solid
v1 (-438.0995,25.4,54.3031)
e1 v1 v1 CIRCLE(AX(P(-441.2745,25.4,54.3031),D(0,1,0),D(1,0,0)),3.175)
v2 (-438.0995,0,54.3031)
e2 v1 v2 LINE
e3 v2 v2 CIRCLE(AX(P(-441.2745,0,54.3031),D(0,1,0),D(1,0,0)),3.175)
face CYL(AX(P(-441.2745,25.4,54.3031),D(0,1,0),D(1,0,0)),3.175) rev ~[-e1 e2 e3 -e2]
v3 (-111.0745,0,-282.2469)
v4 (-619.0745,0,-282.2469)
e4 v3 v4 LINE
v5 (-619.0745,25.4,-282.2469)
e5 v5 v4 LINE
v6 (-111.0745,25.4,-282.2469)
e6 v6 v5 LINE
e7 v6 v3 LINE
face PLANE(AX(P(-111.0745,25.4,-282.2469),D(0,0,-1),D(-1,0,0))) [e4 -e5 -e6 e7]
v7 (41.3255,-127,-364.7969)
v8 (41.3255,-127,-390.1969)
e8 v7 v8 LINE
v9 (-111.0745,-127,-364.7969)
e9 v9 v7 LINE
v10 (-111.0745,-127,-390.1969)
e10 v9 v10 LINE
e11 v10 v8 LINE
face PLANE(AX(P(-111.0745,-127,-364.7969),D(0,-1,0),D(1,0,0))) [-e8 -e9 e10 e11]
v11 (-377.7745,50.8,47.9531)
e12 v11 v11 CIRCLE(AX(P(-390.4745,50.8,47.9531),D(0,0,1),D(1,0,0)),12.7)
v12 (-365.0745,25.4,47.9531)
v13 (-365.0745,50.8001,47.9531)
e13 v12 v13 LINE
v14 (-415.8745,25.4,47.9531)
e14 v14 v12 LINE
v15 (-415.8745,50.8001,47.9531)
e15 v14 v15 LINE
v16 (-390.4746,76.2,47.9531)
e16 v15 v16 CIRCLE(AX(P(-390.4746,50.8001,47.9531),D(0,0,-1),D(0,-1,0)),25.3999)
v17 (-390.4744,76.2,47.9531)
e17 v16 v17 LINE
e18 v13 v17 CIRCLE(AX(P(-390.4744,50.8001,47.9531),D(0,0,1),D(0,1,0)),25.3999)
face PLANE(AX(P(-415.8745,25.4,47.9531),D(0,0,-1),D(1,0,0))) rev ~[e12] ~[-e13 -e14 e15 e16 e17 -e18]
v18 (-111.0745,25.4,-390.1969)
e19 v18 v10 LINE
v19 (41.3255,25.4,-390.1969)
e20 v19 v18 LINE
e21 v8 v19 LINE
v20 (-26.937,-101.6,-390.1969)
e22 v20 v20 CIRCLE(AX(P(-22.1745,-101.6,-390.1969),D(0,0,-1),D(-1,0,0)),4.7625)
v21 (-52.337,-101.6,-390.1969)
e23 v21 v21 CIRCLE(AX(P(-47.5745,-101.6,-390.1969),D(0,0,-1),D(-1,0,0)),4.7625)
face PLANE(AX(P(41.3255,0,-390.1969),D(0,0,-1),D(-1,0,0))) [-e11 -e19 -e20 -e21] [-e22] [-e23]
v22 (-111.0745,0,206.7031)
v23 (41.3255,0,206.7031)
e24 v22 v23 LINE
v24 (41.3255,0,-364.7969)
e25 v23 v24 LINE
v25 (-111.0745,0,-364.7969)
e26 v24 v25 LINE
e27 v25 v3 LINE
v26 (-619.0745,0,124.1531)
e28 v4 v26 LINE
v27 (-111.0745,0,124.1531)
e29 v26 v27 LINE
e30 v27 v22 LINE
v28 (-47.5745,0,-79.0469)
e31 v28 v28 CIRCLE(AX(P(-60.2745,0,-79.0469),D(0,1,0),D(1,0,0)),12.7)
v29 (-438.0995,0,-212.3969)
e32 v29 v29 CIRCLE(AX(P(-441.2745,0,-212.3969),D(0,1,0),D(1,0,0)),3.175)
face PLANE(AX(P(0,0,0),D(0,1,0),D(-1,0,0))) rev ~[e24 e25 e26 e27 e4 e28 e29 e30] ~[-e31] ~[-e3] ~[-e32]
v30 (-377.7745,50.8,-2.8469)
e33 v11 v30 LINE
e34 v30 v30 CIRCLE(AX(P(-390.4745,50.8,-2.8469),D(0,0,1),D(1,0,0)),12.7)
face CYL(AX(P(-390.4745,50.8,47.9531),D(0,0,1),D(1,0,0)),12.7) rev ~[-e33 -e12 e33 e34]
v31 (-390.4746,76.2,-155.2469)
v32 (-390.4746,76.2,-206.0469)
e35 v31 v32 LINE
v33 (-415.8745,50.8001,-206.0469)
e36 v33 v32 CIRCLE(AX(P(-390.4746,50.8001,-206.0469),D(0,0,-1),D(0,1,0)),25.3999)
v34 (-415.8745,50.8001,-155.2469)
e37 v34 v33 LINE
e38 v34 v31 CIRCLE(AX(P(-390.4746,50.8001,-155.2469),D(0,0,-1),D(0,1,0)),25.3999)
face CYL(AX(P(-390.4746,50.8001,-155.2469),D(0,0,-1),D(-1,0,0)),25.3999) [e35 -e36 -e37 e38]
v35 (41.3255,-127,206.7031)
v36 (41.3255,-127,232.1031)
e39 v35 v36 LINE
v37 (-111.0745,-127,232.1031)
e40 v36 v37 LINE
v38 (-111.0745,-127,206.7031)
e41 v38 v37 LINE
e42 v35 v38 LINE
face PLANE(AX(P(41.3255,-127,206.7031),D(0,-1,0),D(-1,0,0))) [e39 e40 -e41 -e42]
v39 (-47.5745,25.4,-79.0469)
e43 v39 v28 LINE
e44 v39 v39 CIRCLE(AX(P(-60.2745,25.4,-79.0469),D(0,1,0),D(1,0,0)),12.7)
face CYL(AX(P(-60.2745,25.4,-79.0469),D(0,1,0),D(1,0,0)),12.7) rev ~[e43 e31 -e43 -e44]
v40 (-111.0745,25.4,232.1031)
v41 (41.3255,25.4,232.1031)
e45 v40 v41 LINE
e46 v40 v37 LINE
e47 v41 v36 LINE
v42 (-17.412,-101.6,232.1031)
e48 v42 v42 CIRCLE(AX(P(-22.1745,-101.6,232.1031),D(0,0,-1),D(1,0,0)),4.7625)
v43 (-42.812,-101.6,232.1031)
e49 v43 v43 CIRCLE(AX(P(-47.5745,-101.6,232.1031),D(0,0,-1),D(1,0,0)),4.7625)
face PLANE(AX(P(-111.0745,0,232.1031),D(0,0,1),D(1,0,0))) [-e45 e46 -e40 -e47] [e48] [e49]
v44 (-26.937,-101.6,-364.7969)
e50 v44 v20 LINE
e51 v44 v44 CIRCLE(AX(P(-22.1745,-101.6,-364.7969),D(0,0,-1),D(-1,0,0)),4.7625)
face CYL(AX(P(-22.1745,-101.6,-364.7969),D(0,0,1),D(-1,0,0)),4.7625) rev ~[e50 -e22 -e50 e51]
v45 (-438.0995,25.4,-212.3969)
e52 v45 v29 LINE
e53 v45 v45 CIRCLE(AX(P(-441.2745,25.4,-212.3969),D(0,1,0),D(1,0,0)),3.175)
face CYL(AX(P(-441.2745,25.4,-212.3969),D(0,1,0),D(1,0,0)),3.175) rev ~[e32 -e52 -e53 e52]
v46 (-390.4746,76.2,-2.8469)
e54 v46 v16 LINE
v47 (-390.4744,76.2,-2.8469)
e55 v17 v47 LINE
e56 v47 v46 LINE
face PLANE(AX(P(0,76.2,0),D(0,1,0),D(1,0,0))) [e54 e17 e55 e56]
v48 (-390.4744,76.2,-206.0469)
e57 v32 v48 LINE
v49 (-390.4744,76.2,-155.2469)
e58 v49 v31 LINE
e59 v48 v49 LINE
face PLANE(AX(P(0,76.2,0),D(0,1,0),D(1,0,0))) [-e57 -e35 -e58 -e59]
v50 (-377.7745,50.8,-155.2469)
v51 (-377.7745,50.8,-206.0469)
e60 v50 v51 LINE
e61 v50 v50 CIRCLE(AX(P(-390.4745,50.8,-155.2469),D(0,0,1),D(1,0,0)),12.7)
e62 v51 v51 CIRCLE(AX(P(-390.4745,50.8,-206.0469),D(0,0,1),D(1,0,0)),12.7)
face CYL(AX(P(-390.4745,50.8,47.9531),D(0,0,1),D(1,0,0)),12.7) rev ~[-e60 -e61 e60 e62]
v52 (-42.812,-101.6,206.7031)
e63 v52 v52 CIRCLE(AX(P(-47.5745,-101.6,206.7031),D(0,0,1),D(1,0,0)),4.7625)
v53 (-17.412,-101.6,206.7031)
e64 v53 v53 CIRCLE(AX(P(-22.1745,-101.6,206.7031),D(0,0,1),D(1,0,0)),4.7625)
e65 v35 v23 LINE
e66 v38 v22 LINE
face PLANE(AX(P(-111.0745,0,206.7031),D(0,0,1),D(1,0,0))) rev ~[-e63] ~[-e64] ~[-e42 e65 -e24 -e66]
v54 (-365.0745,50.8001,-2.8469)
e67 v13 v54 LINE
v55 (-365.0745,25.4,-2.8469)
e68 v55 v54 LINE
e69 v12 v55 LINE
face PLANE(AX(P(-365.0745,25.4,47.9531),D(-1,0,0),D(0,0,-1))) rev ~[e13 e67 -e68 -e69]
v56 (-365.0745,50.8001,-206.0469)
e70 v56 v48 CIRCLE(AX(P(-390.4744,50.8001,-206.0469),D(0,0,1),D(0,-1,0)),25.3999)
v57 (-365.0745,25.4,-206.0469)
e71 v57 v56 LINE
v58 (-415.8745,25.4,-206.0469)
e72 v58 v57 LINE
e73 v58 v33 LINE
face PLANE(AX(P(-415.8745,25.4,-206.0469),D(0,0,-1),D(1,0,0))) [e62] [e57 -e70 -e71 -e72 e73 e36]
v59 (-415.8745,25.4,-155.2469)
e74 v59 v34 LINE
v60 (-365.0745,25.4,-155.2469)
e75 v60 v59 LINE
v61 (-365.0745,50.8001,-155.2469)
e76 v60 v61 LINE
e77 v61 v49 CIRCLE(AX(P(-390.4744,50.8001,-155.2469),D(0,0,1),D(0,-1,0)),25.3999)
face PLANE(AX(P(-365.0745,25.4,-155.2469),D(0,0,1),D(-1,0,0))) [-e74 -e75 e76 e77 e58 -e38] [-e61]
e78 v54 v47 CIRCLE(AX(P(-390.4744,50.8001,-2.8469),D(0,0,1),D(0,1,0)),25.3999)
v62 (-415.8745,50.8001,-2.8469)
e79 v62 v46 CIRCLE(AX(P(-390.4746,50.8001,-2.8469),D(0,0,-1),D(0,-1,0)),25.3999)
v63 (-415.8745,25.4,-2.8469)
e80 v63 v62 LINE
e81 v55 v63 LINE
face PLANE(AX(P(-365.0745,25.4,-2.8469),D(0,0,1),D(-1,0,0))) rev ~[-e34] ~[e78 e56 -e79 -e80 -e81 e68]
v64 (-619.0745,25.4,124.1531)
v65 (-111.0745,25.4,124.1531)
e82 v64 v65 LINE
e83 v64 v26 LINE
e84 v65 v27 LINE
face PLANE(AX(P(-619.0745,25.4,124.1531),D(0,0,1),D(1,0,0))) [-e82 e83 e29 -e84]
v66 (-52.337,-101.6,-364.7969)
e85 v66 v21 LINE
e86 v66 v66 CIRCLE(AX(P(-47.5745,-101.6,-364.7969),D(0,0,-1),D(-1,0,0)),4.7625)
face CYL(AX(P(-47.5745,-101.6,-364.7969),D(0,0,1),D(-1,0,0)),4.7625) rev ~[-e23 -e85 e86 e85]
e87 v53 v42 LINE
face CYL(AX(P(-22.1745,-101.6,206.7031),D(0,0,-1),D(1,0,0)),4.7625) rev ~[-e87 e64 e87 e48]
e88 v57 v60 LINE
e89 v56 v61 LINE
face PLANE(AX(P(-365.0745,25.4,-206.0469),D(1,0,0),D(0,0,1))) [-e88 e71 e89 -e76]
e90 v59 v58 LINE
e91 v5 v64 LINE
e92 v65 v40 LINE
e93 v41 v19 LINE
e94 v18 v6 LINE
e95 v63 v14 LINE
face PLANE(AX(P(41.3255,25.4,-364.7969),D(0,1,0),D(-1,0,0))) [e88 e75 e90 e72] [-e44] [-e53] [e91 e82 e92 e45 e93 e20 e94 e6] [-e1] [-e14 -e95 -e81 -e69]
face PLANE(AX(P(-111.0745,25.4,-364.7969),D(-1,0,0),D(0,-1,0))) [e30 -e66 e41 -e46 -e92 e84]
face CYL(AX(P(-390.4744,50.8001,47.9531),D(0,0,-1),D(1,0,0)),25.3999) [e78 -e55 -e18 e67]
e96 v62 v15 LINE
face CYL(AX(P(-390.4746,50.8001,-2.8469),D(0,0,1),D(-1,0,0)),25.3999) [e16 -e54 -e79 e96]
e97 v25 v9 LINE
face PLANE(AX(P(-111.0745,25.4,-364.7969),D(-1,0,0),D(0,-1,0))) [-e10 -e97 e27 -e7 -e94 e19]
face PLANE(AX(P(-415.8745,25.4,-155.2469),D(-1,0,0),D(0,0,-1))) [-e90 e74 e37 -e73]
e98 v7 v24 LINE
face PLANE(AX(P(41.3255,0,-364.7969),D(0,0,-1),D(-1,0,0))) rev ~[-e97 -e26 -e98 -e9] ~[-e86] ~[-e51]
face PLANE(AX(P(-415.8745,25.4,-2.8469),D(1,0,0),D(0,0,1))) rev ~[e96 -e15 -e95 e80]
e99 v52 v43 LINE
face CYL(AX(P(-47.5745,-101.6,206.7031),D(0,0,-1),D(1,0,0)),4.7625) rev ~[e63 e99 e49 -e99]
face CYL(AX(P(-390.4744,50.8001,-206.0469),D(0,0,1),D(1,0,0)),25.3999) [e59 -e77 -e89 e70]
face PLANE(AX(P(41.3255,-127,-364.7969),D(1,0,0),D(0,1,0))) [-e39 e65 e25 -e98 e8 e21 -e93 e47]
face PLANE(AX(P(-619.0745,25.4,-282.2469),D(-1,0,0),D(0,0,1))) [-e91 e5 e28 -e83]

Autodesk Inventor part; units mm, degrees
ref_plane "YZ Plane" through (0, 0, 0) normal (1, 0, 0) x (0, 1, 0)
ref_plane "XZ Plane" through (0, 0, 0) normal (0, 1, 0) x (-1, 0, 0)
ref_plane "XY Plane" through (0, 0, 0) normal (0, 0, 1) x (1, 0, 0)
sketch "Sketch1" plane through (0, 0, 0) normal (0, 1, 0) x (-1, 0, 0)
  line L0 (111.0745, 206.7031) -> (-41.3255, 206.7031)
  line L1 (-41.3255, 206.7031) -> (-41.3255, -364.7969)
  line L2 (-41.3255, -364.7969) -> (111.0745, -364.7969)
  line L3 (111.0745, -364.7969) -> (111.0745, 206.7031)
  point P0 (0, 0)
  dimension "d0" = 571.5
  dimension "d1" = 152.4
extrude "Extrusion1" add sketch "Sketch1" along normal blind 25.4
sketch "Sketch2" plane through (-111.0745, 0, 206.7031) normal (0, 0, 1) x (1, 0, 0)
  line L0 (0, 0) -> (0, 25.4) projected
  line L1 (0, 25.4) -> (152.4, 25.4)
  line L2 (152.4, 25.4) -> (152.4, -127)
  line L3 (152.4, -127) -> (0, -127)
  line L4 (0, -127) -> (0, 25.4)
  line L5 (152.4, 0) -> (152.4, 25.4) projected
  line L6 (0, 0) -> (152.4, 0) projected
  line L7 (0, -127) -> (152.4, -127)
  line L8 (152.4, -127) -> (152.4, -101.6)
  line L9 (152.4, -101.6) -> (0, -101.6)
  line L10 (0, -101.6) -> (0, -127)
  circle A0 centre (63.5, -101.6) radius 4.7625
  circle A1 centre (88.9, -101.6) radius 4.7625
  line L11 (0, -127) -> (63.5, -101.6) construction
  line L12 (88.9, -101.6) -> (152.4, -127) construction
  point P0 (111.0745, 0)
  point P1 (58.7375, -101.6)
  point P2 (68.2625, -101.6)
  point P3 (84.1375, -101.6)
  point P4 (93.6625, -101.6)
  dimension "d5" = 127
  dimension "d6" = 25.4
  dimension "d7" = 25.4
  dimension "d8" = 9.525
extrude "Extrusion2" add sketch "Sketch2" along normal blind 25.4 contours L6 L2 L9 A1 A0 L4 | L0 L1 L2 L6 | L9 A0 A1 L2 L3 L4
sketch "Sketch3" plane through (41.3255, 0, -364.7969) normal (0, 0, -1) x (-1, 0, 0)
  line L0 (0, 25.4) -> (152.4, 25.4) projected
  line L1 (152.4, 0) -> (152.4, -127) projected
  line L2 (0, 25.4) -> (152.4, 25.4)
  line L3 (152.4, 25.4) -> (152.4, -127)
  line L4 (152.4, -127) -> (0, -127)
  line L5 (0, -127) -> (0, 25.4)
  circle A0 centre (63.5, -101.6) radius 4.7625 projected
  circle A1 centre (63.5, -101.6) radius 4.7625
  circle A2 centre (88.9, -101.6) radius 4.7625 projected
  circle A3 centre (88.9, -101.6) radius 4.7625
  point P0 (41.3255, 0)
  dimension "d15" = 9.525
  dimension "d16" = 9.525
extrude "Extrusion3" add sketch "Sketch3" along normal blind 25.4
sketch "Sketch4" plane through (0, 25.4, 0) normal (0, 1, 0) x (1, 0, 0)
  line L0 (-52.337, 390.1969) -> (-42.812, 390.1969) construction
  line L1 (41.3255, -232.1031) -> (-111.0745, -232.1031) construction
  line L2 (-111.0745, -232.1031) -> (-111.0745, 390.1969) construction
  line L3 (-111.0745, 79.0469) -> (41.3255, 79.0469) construction
  line L4 (41.3255, 390.1969) -> (41.3255, -232.1031) construction
  line L5 (41.3255, 390.1969) -> (-111.0745, 390.1969) construction
  circle A0 centre (-60.2745, 79.0469) radius 12.7
  point P0 (0, 0)
  dimension "d17" = 25.4
  dimension "d20" = 50.8
extrude "Extrusion4" cut sketch "Sketch4" against normal through all
sketch "Sketch5" plane through (0, 25.4, 0) normal (0, 1, 0) x (1, 0, 0)
  line L0 (-111.0745, -232.1031) -> (-111.0745, 390.1969) projected
  line L1 (-111.0745, 282.2469) -> (-619.0745, 282.2469)
  line L2 (-619.0745, 282.2469) -> (-619.0745, -124.1531)
  line L3 (-619.0745, -124.1531) -> (-111.0745, -124.1531)
  line L4 (-111.0745, -124.1531) -> (-111.0745, 282.2469)
  line L5 (41.3255, 390.1969) -> (-111.0745, 390.1969) construction
  line L6 (-619.0745, 282.2469) -> (-111.0745, 390.1969) construction
  line L7 (-111.0745, -232.1031) -> (-619.0745, -124.1531) construction
  point P0 (0, 0)
  point P1 (-111.0745, -124.1531)
  dimension "d21" = 508
  dimension "d22" = 406.4
extrude "Extrusion5" add sketch "Sketch5" against normal blind 25.4
sketch "Sketch6" plane through (0, 25.4, 0) normal (0, 1, 0) x (1, 0, 0)
  line L0 (-619.0745, -124.1531) -> (-619.0745, 282.2469) construction
  line L1 (-619.0745, 282.2469) -> (-441.2745, 282.2469) construction
  line L2 (-441.2745, 282.2469) -> (-441.2745, -124.1531) construction
  line L3 (-441.2745, -124.1531) -> (-619.0745, -124.1531) construction
  line L4 (-619.0745, -124.1531) -> (-619.0745, 282.2469) construction
  circle A0 centre (-441.2745, 212.3969) radius 3.175
  circle A1 centre (-441.2745, -54.3031) radius 3.175
  line L5 (-619.0745, -124.1531) -> (-111.0745, -124.1531) projected
  line L6 (-111.0745, 282.2469) -> (-619.0745, 282.2469) projected
  line L7 (-111.0745, -232.1031) -> (-111.0745, -124.1531) projected
  line L8 (-111.0745, 282.2469) -> (-111.0745, 390.1969) projected
  point P0 (0, 0)
  dimension "d26" = 69.85
  dimension "d27" = 69.85
  dimension "d28" = 6.35
  dimension "d33" = 330.2
  dimension "d34" = 330.2
extrude "Extrusion6" cut sketch "Sketch6" against normal through all
sketch "Sketch7" plane through (0, 25.4, 0) normal (0, 1, 0) x (1, 0, 0)
  line L0 (41.3255, -206.7031) -> (41.3255, 364.7969) construction
  line L1 (41.3255, 364.7969) -> (-365.0745, 364.7969) construction
  line L2 (-365.0745, 364.7969) -> (-365.0745, -206.7031) construction
  line L3 (-365.0745, -206.7031) -> (41.3255, -206.7031) construction
  line L4 (41.3255, -206.7031) -> (41.3255, 364.7969) construction
  line L5 (-619.0745, 282.2469) -> (-111.0745, 282.2469) construction
  line L6 (-365.0745, 282.2469) -> (-415.8745, 282.2469) construction
  line L7 (-415.8745, 282.2469) -> (-415.8745, -124.1531) construction
  line L8 (-415.8745, -124.1531) -> (-365.0745, -124.1531) construction
  line L9 (-365.0745, -124.1531) -> (-365.0745, 282.2469) construction
  line L10 (-415.8745, 282.2469) -> (-365.0745, 282.2469) construction
  line L11 (-365.0745, 282.2469) -> (-365.0745, -124.1531) construction
  line L12 (-365.0745, -124.1531) -> (-415.8745, -124.1531) construction
  line L13 (-415.8745, -124.1531) -> (-415.8745, 282.2469) construction
  line L14 (-415.8745, 206.0469) -> (-365.0745, 206.0469)
  line L15 (-365.0745, 206.0469) -> (-365.0745, 155.2469)
  line L16 (-365.0745, 155.2469) -> (-415.8745, 155.2469)
  line L17 (-415.8745, 155.2469) -> (-415.8745, 206.0469)
  line L18 (-415.8745, -47.9531) -> (-365.0745, -47.9531)
  line L19 (-365.0745, -47.9531) -> (-365.0745, 2.8469)
  line L20 (-365.0745, 2.8469) -> (-415.8745, 2.8469)
  line L21 (-415.8745, 2.8469) -> (-415.8745, -47.9531)
  point P0 (0, 0)
  dimension "d31" = 406.4
  dimension "d35" = 406.4
  dimension "d36" = 50.8
  dimension "d39" = 152.4
  dimension "d40" = 50.8
  dimension "d41" = 50.8
  dimension "d42" = 76.2
  dimension "d43" = 76.2
extrude "Extrusion7" add sketch "Sketch7" along normal blind 50.8
sketch "Sketch9" plane through (-415.8745, 25.4, 47.9531) normal (0, 0, 1) x (1, 0, 0)
  line L0 (50.8, 0) -> (50.8, 50.8) construction
  line L1 (50.8, 50.8) -> (0, 50.8) construction
  line L2 (50.8, 25.4) -> (25.4, 25.4) construction
  line L3 (25.4, 25.4) -> (25.4, 50.8) construction
  line L4 (25.4, 50.8) -> (50.8, 50.8) construction
  line L5 (50.8, 50.8) -> (50.8, 25.4) construction
  circle A0 centre (25.4, 25.4) radius 12.7
  point P0 (415.8745, -25.4)
  dimension "d44" = 25.4
extrude "Extrusion8" cut sketch "Sketch9" against normal through all
fillet "Fillet1" radius 25.4 4 edges at (-415.8745, 76.2, 22.5531) (-365.0745, 76.2, 22.5531) (-415.8745, 76.2, -180.6469) (-365.0745, 76.2, -180.6469)
equation "\"d27\" = d26"
equation "\"BendRadius\" = Thickness"
equation "\"BendReliefWidth\" = Thickness"
equation "\"BendReliefDepth\" = 0.5 * Thickness"
equation "\"CornerReliefSize\" = 4 * Thickness"
equation "\"MinimumRemnant\" = 2 * Thickness"
equation "\"TransitionRadius\" = BendRadius"
equation "\"JacobiRadiusSize\" = BendRadius"
equation "\"GapSize\" = Thickness"
equation "\"Thickness\" = 3.048"
properties part number "Steering Mount"
